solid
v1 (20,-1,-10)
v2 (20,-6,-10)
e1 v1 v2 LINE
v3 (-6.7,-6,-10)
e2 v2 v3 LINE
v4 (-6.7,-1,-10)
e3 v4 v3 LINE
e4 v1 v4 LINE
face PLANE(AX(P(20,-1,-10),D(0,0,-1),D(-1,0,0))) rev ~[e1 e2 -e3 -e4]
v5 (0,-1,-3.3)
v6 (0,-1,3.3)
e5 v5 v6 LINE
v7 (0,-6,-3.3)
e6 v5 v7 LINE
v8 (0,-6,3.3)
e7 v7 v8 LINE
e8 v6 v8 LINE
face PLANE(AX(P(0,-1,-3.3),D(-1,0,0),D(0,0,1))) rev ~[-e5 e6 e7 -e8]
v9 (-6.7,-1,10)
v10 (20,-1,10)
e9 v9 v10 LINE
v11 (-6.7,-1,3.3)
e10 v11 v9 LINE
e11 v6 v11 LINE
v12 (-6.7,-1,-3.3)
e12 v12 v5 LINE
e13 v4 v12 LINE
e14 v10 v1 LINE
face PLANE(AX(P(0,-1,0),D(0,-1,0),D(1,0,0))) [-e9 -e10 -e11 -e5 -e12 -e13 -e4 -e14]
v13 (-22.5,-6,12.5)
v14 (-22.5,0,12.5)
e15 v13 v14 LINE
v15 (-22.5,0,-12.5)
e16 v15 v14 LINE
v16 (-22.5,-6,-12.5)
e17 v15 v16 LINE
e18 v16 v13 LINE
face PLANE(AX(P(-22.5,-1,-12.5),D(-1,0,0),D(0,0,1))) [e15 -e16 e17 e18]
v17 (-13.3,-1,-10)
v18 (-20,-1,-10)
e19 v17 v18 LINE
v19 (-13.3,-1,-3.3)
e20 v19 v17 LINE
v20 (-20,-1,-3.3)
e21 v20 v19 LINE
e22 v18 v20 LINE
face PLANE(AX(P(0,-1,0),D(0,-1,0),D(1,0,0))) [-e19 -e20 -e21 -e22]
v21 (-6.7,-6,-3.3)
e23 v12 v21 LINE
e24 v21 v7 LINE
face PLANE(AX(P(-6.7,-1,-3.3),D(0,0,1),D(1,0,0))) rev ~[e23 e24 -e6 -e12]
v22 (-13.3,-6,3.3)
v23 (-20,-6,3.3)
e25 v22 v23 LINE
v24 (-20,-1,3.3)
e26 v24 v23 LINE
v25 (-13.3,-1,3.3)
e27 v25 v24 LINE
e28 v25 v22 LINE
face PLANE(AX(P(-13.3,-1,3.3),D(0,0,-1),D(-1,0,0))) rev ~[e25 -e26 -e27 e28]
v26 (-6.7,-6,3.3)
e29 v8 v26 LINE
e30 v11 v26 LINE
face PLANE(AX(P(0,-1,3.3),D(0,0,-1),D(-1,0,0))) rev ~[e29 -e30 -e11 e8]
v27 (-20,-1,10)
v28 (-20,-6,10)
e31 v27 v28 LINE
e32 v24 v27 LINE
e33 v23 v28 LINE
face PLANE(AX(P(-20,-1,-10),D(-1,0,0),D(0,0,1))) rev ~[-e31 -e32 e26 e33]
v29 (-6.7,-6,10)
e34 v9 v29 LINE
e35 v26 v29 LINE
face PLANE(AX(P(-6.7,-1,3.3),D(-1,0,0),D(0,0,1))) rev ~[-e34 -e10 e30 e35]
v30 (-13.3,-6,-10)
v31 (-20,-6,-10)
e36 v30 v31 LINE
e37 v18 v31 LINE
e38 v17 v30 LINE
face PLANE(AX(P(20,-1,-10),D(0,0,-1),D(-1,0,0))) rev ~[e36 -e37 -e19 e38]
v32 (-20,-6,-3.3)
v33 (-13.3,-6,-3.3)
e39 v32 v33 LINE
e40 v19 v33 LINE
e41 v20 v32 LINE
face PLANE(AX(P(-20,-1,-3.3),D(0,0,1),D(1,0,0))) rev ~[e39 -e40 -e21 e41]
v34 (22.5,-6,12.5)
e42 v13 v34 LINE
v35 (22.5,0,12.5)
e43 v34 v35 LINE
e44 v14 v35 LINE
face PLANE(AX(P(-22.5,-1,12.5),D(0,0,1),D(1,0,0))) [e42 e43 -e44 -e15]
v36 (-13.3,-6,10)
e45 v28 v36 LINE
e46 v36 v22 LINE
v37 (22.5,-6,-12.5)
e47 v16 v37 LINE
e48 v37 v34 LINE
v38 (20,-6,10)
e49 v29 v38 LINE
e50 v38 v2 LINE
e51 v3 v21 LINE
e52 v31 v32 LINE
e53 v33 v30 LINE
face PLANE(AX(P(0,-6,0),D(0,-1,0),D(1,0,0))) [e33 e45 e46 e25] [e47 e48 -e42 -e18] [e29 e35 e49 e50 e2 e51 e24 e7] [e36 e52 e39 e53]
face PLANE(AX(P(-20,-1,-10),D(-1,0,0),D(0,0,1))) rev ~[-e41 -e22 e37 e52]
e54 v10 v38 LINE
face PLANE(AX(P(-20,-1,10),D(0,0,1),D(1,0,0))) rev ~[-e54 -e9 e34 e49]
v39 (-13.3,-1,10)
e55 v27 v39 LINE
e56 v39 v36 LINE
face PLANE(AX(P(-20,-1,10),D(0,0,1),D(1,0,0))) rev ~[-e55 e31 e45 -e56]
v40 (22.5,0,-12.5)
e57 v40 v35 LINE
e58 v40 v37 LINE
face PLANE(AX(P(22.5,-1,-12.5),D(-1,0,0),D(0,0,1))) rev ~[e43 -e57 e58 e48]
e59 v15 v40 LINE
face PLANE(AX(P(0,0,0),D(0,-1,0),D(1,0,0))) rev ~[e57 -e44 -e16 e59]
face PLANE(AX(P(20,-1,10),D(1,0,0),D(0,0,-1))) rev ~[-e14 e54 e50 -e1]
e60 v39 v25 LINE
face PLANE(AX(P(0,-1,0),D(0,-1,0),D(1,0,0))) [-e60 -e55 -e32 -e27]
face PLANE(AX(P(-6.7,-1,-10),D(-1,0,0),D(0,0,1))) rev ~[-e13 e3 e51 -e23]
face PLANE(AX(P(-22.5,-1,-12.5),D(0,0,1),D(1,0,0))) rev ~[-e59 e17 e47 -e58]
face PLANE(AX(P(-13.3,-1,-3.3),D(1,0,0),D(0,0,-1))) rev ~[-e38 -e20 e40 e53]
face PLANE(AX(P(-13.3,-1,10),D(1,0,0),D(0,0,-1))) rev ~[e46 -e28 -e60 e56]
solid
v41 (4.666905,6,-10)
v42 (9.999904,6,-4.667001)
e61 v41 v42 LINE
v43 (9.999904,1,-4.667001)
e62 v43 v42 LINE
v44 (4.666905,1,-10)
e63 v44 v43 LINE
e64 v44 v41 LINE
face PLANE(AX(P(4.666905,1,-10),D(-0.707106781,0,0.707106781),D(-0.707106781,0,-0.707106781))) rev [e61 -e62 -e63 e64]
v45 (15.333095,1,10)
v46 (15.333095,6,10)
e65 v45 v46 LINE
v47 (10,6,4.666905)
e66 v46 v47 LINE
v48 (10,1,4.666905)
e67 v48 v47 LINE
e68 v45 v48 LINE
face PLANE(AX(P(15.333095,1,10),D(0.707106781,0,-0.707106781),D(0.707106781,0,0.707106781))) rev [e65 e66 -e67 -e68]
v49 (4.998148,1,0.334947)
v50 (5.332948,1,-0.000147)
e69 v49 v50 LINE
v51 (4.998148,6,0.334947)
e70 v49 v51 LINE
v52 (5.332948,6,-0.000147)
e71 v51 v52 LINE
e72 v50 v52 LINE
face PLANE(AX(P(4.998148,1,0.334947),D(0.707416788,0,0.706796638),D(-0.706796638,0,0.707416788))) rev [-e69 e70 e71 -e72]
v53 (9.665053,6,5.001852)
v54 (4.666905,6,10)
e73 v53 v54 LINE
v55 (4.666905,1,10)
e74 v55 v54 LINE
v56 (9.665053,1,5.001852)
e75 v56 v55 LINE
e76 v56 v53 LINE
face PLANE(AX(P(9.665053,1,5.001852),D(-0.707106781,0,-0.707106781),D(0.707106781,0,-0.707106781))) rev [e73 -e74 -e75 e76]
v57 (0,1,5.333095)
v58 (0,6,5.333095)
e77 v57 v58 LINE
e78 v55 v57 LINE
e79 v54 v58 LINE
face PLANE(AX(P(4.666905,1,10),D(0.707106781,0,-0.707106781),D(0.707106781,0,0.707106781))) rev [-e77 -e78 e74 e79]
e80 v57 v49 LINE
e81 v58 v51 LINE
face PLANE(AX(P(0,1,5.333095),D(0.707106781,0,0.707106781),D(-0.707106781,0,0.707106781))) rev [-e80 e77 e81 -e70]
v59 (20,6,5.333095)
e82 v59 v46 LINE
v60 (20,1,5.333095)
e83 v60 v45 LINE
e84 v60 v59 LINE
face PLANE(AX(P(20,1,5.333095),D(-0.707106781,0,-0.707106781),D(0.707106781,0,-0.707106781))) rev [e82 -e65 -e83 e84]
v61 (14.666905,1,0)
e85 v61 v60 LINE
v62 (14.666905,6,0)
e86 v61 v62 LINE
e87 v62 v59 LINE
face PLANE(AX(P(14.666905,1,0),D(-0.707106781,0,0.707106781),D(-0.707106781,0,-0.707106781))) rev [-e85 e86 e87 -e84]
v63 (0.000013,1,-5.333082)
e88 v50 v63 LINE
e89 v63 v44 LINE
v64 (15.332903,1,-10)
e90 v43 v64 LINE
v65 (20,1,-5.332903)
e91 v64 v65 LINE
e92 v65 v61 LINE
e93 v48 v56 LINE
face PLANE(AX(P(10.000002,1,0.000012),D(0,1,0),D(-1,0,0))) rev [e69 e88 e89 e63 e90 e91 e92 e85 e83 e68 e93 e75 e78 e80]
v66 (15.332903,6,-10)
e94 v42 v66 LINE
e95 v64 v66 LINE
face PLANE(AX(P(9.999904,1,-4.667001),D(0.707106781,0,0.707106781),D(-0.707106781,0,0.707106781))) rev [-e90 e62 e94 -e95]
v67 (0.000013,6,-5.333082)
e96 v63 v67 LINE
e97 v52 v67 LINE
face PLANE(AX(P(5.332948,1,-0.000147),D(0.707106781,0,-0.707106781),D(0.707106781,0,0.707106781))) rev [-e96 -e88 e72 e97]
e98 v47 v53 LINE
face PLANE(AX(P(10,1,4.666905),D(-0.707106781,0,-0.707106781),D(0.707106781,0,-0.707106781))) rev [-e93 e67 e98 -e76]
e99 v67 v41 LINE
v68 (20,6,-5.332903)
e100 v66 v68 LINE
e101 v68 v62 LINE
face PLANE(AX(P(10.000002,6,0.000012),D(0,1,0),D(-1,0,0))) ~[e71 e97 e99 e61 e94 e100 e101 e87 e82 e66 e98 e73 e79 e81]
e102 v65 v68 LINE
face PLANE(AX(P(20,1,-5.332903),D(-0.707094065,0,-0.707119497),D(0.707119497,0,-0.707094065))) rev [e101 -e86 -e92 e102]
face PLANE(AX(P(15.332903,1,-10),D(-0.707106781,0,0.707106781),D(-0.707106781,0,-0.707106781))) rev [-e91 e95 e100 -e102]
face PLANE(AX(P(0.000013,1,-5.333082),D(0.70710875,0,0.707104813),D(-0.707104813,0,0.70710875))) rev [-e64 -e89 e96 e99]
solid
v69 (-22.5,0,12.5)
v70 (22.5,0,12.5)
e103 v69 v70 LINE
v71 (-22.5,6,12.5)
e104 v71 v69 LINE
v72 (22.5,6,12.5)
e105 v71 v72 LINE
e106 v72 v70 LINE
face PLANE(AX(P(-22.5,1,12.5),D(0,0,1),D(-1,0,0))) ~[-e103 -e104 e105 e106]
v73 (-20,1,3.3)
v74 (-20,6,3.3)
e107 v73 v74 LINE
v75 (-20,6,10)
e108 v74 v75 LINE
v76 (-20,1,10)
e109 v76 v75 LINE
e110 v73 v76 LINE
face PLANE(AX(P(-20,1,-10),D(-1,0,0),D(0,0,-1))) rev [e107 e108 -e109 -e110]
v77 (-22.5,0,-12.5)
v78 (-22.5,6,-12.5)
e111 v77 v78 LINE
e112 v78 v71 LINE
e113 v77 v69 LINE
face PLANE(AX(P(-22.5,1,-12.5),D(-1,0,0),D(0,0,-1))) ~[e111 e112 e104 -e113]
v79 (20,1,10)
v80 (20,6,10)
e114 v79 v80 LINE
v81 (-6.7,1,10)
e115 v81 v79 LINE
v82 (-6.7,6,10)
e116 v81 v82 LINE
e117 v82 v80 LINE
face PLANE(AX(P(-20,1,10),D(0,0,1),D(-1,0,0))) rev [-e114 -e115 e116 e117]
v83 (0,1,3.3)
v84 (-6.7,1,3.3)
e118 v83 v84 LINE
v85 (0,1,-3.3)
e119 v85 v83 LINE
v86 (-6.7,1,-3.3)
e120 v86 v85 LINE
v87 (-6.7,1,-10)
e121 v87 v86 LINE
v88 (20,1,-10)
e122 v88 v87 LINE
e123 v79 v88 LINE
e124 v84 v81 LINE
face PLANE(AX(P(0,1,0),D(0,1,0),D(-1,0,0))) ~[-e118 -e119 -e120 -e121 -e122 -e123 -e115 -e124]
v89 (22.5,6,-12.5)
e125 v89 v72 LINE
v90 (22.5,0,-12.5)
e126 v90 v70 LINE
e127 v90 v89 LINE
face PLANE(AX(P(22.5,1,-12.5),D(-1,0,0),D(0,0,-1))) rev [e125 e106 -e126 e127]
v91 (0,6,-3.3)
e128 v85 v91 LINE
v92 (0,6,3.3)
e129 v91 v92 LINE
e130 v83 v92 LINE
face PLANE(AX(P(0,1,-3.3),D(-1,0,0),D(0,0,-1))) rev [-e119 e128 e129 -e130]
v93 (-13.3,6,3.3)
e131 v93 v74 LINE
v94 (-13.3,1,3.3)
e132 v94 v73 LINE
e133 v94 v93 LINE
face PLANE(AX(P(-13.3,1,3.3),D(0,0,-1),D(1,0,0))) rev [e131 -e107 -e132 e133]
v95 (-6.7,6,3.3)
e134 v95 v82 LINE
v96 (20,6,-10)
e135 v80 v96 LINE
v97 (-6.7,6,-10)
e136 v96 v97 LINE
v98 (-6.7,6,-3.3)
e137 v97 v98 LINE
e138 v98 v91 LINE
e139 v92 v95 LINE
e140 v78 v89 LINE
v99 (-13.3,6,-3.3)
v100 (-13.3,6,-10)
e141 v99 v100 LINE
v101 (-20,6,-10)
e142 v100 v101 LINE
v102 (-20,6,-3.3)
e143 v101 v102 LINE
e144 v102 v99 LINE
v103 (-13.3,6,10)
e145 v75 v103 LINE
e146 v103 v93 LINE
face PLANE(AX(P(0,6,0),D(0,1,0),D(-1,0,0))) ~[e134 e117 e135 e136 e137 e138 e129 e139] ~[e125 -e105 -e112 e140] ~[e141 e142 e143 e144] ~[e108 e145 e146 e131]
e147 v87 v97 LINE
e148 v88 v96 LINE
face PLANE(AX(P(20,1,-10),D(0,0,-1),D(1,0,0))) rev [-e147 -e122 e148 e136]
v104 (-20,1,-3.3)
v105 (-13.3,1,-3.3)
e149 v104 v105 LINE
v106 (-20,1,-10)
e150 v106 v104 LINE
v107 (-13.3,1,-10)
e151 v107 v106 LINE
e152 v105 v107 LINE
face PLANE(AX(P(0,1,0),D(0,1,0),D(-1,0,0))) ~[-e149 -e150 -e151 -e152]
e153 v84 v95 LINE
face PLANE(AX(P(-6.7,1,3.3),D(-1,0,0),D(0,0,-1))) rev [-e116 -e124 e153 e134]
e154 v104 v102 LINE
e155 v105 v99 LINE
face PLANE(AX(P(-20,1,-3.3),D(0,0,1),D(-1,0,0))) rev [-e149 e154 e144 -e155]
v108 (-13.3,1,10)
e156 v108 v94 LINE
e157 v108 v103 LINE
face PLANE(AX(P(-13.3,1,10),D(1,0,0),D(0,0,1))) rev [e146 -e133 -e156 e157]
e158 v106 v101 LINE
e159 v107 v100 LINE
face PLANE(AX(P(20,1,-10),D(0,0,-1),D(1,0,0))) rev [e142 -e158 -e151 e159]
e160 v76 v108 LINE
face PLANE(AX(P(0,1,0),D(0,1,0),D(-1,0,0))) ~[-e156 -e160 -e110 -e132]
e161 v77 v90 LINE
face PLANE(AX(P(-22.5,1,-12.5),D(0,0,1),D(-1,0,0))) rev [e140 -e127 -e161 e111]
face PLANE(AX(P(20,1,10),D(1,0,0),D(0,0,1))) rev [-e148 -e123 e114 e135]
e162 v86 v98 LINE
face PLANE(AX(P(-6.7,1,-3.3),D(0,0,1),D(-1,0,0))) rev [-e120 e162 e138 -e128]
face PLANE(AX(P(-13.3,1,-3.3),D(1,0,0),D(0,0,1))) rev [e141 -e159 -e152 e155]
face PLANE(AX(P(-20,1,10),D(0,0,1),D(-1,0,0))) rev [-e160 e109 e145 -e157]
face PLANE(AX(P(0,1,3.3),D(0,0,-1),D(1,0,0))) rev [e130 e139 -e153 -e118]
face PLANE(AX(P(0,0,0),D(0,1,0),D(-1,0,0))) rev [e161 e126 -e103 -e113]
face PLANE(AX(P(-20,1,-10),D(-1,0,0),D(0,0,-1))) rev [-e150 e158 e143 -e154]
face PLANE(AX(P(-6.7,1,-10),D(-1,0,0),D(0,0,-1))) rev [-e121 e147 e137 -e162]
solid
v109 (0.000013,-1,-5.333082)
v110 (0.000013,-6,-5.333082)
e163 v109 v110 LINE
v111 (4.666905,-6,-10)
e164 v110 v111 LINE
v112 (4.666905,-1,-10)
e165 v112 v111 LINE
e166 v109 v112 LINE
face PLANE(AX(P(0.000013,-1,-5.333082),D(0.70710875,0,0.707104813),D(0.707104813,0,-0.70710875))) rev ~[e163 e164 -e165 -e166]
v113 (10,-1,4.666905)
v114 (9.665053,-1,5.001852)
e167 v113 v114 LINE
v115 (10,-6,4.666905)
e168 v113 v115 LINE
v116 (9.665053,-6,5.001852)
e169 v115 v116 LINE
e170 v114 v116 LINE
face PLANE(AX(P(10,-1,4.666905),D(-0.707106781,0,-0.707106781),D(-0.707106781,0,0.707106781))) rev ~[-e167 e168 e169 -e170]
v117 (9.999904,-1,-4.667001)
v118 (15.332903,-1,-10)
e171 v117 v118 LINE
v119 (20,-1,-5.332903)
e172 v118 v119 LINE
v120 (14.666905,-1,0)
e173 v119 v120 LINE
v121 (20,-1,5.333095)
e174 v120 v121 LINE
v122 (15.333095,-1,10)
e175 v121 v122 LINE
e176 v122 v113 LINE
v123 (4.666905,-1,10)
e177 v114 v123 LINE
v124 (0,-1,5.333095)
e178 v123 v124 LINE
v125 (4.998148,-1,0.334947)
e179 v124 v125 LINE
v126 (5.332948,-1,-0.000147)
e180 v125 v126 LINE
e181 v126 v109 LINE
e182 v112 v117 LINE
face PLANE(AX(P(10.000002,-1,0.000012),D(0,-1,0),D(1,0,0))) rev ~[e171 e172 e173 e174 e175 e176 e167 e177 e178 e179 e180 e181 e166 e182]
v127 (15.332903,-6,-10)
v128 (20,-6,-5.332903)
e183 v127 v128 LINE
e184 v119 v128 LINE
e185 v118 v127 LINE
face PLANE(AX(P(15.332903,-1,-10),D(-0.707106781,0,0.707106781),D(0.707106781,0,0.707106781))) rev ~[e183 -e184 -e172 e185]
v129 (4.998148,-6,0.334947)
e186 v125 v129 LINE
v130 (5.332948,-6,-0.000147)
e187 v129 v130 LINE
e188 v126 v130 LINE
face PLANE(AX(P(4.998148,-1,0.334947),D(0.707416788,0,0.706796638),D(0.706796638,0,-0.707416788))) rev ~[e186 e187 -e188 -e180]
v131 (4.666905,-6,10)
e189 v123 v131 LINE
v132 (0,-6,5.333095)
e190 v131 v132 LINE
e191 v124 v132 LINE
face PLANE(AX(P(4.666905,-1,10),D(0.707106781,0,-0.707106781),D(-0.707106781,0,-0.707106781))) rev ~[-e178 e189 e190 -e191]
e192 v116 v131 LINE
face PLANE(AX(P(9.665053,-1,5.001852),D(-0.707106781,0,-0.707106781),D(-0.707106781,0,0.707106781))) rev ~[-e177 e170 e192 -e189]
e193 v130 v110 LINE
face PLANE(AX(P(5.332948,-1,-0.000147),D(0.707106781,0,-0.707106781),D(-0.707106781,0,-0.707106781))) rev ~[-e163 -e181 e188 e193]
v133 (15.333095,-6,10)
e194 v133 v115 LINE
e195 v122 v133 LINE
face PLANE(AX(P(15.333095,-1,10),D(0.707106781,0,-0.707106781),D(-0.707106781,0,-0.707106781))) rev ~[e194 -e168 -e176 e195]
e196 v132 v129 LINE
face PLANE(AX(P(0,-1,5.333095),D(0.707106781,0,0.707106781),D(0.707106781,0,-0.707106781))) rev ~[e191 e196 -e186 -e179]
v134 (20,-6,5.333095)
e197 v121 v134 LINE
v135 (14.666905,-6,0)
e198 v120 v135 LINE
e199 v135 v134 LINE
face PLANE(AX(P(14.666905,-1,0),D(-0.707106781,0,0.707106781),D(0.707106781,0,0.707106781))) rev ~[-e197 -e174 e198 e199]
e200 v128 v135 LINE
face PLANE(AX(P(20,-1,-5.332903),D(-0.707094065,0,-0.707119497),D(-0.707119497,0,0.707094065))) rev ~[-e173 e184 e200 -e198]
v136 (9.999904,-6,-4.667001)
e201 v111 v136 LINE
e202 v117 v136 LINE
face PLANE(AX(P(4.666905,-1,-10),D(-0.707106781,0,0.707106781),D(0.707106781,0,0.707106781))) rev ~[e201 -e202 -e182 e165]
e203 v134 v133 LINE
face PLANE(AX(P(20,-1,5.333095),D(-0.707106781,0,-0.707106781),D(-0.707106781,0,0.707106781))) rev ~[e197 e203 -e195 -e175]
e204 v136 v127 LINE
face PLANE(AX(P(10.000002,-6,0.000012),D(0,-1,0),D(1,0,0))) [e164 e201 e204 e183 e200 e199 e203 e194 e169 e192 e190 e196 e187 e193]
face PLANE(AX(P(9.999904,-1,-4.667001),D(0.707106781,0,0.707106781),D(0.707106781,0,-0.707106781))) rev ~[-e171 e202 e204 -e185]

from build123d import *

# Parameters (mm, degrees)
F0_W     = 45
F0_H     = 25
F1_DEPTH = 1
F2_W     = 45
F2_H     = 25
F3_DEPTH = 5
F4_DEPTH = 5
F5_DEPTH = 5


# Not quite as in the source:
# - ends of sketch curves that miss each other by under 0.0002 mm in the source are joined


with BuildPart() as f1:
    # F0 (on Front) → F1 (new body)
    with BuildSketch(Plane.XZ):
        Rectangle(F0_W, F0_H)
    extrude(amount=F1_DEPTH)

    # F2 (on face) → F3 (join)
    with BuildSketch(Plane.XZ.offset(1)):
        Rectangle(F2_W, F2_H)
        Polygon((-20, 3.3), (-20, 10), (-13.3, 10), (-6.7, 10), (4.6669047558, 10), (15.3330952385, 10), (20, 10), (20, 5.3330952385), (20, -5.3329034452), (20, -10), (15.3329034452, -10), (4.6669112521, -10), (-6.7, -10), (-13.3, -10), (-20, -10), (-20, -3.3), align=None, mode=Mode.SUBTRACT)
    extrude(amount=F3_DEPTH)

    # F2 (on face) → F4 (join)
    with BuildSketch(Plane.XZ.offset(1)):
        Polygon((-6.7, 10), (-13.3, 10), (-13.3, 3.3), (-20, 3.3), (-20, -3.3), (-13.3, -3.3), (-13.3, -10), (-6.7, -10), (-6.7, -3.3), (0, -3.3), (0, 0), (0, 3.3), (-6.7, 3.3), align=None)
    extrude(amount=F4_DEPTH)


with BuildPart() as f5:
    # F2 (on face) → F5 (new body)
    with BuildSketch(Plane.XZ.offset(1)):
        Polygon((9.6650526696, 5.0018520863), (4.6669047558, 10), (0, 5.3330952442), (4.9981479137, 0.3349473304), (5.3329483647, -0.0001468775), (1.29926e-05, -5.3330822516), (4.6669047558, -10), (9.9999041025, -4.6670006553), (15.3329034452, -10), (20, -5.3329034452), (14.6669047548, -4.7e-09), (20, 5.3330952385), (15.3330952385, 10), (9.9999999982, 4.6669047577), align=None)
    extrude(amount=F5_DEPTH)


with BuildPart() as f6_1:
    # F6: instance of F1
    add(f1.part.mirror(Plane.XZ))


with BuildPart() as f6_2:
    # F6: instance of F5
    add(f5.part.mirror(Plane.XZ))


solid = Compound([f1.part, f5.part, f6_1.part, f6_2.part])
